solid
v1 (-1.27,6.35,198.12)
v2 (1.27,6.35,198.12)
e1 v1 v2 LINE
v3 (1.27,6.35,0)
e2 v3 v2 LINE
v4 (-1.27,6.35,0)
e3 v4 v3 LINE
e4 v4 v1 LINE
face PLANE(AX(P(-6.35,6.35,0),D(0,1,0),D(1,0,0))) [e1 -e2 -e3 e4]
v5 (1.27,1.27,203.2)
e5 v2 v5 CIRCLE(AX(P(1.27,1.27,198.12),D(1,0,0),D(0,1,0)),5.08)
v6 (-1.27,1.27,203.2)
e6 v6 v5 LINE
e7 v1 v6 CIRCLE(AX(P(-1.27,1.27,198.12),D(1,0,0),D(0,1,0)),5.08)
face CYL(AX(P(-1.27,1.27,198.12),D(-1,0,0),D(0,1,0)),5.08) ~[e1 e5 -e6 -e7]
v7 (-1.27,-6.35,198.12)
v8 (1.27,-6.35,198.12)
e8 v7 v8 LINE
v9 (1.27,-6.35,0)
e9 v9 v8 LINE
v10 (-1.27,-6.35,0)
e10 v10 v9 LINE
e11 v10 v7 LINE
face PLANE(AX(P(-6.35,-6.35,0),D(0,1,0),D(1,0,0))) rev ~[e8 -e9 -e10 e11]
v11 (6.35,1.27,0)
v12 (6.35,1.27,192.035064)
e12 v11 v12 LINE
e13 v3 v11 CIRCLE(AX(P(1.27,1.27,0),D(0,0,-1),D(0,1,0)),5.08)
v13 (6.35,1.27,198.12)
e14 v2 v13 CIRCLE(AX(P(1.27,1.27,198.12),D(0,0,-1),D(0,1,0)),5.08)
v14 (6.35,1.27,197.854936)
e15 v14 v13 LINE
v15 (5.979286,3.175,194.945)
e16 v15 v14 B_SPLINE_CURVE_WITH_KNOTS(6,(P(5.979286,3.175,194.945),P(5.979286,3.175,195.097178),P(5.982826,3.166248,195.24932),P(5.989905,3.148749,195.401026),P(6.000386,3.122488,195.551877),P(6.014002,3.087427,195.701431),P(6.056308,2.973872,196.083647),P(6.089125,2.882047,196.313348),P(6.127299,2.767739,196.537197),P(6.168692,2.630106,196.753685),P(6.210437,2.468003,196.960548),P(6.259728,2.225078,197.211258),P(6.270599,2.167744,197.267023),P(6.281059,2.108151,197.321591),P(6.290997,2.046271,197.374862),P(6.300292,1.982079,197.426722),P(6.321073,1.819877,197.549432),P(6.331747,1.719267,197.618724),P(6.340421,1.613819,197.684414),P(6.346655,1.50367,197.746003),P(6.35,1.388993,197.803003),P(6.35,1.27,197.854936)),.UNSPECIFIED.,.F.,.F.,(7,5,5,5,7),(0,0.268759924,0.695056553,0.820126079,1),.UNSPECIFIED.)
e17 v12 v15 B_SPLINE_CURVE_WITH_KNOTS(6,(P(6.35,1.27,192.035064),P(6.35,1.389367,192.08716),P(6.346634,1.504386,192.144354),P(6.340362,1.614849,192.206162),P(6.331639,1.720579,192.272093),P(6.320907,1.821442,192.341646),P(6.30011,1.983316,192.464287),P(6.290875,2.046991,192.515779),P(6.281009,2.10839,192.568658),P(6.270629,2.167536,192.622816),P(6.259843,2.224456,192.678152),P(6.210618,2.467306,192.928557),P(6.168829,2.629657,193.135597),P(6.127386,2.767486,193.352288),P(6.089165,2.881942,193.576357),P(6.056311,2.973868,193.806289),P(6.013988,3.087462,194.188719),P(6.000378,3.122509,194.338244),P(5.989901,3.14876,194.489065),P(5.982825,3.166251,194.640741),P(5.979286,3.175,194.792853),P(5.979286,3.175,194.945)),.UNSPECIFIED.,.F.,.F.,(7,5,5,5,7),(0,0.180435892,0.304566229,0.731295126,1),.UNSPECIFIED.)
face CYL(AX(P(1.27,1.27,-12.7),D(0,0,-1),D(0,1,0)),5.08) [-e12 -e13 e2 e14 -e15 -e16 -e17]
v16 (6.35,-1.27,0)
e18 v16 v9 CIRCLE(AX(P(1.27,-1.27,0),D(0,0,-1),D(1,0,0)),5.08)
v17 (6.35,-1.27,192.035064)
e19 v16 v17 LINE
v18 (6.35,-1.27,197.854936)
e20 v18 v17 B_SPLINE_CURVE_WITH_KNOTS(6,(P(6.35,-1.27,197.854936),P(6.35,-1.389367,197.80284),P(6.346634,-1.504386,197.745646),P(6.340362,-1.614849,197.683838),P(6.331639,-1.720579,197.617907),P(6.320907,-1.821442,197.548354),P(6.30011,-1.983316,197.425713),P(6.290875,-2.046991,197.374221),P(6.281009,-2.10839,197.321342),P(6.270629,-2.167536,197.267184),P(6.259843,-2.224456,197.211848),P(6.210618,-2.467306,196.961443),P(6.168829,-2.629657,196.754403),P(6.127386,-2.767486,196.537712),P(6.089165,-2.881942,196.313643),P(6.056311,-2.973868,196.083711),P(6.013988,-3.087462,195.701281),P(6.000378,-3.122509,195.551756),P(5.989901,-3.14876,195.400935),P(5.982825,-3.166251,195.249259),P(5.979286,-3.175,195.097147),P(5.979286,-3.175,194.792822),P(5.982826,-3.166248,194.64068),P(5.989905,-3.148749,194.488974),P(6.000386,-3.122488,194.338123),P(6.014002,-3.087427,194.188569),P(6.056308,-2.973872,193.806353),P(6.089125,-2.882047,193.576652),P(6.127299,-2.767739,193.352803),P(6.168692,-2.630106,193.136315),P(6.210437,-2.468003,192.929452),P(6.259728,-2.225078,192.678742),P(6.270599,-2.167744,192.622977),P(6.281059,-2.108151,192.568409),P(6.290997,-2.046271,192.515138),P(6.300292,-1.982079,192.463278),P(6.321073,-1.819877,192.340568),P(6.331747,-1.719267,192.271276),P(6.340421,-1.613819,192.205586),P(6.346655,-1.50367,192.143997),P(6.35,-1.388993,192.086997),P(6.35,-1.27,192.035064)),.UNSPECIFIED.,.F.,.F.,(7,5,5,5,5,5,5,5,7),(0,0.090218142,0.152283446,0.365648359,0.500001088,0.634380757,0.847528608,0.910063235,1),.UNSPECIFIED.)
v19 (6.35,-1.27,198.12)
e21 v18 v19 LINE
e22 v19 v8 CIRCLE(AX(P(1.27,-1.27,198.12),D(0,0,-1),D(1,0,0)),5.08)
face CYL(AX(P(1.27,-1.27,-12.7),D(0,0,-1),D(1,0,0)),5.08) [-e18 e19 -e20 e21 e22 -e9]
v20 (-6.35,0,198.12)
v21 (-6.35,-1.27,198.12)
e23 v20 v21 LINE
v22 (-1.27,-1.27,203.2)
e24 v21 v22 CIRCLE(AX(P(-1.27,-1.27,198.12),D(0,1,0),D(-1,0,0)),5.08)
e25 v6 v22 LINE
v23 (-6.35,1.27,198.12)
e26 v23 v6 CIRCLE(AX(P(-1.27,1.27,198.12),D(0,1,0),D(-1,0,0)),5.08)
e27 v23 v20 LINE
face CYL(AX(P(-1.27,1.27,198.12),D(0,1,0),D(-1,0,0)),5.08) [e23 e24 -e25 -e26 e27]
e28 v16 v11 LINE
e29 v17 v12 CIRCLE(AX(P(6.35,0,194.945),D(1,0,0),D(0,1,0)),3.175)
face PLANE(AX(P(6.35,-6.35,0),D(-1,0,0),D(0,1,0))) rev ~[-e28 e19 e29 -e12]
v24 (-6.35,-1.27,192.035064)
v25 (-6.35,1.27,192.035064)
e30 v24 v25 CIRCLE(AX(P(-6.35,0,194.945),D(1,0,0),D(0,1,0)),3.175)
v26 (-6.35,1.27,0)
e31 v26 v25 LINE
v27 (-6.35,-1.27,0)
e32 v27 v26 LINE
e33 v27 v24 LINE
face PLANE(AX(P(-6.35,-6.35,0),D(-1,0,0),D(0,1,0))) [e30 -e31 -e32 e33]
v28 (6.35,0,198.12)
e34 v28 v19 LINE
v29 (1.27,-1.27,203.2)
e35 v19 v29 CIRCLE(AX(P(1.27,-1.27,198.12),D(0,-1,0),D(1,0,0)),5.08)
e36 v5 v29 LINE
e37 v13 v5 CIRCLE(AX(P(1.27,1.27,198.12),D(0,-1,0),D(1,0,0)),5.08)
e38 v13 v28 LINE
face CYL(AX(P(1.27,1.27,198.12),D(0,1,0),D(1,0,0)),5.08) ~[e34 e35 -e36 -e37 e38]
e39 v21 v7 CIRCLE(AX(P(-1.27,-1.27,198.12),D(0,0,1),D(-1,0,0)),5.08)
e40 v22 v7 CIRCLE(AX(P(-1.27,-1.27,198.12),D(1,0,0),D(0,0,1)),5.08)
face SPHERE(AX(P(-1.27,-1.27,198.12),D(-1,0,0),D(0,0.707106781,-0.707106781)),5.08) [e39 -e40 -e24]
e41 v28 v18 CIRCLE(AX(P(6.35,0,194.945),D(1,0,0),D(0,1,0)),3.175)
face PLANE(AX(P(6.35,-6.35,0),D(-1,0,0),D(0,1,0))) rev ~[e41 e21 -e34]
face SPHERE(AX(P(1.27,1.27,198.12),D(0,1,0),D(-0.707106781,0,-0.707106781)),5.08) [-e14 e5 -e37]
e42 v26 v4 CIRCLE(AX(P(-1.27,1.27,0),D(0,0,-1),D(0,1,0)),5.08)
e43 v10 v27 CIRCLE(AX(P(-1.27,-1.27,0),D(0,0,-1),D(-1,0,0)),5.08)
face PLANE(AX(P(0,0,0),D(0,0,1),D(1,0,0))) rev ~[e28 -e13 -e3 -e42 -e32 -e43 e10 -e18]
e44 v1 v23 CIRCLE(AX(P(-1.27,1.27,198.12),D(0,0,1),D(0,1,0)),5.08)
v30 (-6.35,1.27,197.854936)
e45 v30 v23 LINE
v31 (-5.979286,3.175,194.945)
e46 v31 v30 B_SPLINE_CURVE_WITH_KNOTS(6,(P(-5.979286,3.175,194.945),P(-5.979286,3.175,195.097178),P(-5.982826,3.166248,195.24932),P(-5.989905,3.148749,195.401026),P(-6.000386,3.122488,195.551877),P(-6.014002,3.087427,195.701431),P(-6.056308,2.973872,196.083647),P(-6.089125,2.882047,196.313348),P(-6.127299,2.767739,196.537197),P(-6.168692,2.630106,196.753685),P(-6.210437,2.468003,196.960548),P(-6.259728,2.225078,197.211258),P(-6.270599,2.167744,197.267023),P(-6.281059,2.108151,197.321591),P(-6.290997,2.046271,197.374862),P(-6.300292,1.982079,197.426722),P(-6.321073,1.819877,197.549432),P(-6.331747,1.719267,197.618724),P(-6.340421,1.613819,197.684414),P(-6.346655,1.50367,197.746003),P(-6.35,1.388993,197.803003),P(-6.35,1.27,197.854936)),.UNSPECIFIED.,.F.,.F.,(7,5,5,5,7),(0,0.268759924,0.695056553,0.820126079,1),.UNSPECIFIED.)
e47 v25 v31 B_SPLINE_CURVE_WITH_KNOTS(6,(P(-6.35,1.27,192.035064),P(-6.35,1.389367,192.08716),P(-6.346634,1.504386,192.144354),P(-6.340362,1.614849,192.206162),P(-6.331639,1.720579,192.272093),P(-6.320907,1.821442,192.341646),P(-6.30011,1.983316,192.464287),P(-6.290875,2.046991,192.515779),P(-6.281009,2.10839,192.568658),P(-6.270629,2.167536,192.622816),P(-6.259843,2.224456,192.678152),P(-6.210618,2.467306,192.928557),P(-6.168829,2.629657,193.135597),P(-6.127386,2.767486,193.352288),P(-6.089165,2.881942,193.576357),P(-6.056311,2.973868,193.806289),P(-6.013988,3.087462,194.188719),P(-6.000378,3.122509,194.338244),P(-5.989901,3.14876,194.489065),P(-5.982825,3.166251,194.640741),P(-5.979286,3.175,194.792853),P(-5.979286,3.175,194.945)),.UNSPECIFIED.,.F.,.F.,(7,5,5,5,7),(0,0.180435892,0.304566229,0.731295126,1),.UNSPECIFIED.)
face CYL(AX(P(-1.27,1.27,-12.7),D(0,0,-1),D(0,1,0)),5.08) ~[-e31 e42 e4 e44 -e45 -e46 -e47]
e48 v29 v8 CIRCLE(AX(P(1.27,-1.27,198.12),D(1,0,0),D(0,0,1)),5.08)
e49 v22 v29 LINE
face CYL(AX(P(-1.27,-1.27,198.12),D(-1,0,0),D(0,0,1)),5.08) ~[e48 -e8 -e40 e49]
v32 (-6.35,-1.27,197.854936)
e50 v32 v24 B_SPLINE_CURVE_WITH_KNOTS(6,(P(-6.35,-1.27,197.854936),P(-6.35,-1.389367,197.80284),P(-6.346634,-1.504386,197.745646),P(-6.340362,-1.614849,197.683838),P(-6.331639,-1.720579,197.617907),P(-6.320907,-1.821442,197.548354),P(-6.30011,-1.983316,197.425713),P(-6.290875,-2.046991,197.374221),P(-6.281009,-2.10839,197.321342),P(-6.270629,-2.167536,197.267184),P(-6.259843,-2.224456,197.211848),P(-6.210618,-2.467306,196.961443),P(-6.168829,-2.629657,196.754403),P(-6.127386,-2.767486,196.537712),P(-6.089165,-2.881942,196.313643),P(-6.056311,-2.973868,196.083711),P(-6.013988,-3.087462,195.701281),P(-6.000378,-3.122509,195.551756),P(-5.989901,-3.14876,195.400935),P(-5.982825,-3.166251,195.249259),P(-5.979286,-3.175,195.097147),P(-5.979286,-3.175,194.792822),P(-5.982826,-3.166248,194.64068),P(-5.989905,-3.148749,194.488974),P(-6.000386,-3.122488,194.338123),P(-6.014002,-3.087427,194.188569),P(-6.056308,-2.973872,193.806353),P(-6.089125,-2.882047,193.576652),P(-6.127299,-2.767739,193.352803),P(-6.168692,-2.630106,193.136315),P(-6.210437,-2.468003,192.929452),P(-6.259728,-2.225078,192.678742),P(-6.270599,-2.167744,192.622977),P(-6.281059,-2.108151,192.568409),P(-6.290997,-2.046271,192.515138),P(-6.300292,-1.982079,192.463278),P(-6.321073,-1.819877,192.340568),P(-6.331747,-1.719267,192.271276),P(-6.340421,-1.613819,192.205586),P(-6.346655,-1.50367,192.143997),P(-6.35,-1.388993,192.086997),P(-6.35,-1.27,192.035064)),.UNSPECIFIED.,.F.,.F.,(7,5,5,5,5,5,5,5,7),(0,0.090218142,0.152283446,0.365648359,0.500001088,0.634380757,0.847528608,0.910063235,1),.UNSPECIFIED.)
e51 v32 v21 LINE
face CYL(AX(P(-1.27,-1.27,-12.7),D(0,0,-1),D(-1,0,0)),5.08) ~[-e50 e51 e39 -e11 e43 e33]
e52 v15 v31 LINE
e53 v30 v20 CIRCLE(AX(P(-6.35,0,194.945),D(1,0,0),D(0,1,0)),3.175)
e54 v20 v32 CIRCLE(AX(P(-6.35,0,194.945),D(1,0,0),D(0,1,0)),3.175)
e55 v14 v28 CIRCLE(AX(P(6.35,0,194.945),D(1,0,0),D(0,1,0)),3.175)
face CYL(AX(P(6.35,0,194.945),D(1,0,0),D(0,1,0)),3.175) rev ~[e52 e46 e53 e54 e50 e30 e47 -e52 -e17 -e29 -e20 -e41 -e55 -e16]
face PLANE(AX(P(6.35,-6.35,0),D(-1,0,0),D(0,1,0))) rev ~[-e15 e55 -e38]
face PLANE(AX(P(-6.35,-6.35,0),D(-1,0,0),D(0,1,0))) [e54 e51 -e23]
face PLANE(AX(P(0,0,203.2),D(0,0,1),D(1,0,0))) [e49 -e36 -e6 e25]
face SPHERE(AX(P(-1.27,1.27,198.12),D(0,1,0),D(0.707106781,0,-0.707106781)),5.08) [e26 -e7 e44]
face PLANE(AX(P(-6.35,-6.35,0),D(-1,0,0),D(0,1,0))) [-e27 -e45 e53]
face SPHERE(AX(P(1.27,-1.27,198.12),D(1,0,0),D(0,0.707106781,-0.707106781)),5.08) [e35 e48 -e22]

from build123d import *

# Parameters (mm, degrees)
F0_W         = 12.7
F0_H         = 12.7
F1_DEPTH     = 203.2
F2_R         = 3.175
F3_DEPTH     = 25.4
F4_T1_DEPTH  = 210.82
F4_T3_DEPTH  = 2.54
F4_T5_DEPTH  = 2.54
F4_S9_W      = 5.08
F4_S9_H      = 5.08
F4_T10_DEPTH = 5.08
F4_S15_W     = 5.08
F4_S15_H     = 5.08
F4_T16_DEPTH = 5.08
F4_S21_W     = 5.08
F4_S21_H     = 5.08
F4_T22_DEPTH = 5.08
F4_S27_W     = 5.08
F4_S27_H     = 5.08
F4_T28_DEPTH = 5.08


# Not quite as in the source:
# - a fillet or chamfer that OpenCascade refuses, or shapes differently, is made with other operations: its cross-section is extruded or revolved along the edge and cut away or added


with BuildPart() as f1:
    # F0 (on Top) → F1 (new body)
    with BuildSketch(Plane.XY):
        Rectangle(F0_W, F0_H)
    extrude(amount=F1_DEPTH)

    # F2 (on face) → F3 (cut)
    with BuildSketch(Plane.YZ.offset(6.35)):
        with Locations((0, 194.945)):
            Circle(F2_R)
    extrude(amount=-F3_DEPTH, mode=Mode.SUBTRACT)

    # F4: fillet of radius 5.08 on 8 edges, made by hand

    # F4_s2 → F4_t1 (cut)
    with BuildSketch(Plane.XY.offset(-12.7)):
        with BuildLine():
            ThreePointArc((1.27, 6.35), (4.8621024484, 4.8621024484), (6.35, 1.27))
            Line((6.35, 1.27), (6.35, 6.35))
            Line((6.35, 6.35), (1.27, 6.35))
        make_face()
        with BuildLine():
            ThreePointArc((6.35, -1.27), (4.8621024484, -4.8621024484), (1.27, -6.35))
            Line((1.27, -6.35), (6.35, -6.35))
            Line((6.35, -6.35), (6.35, -1.27))
        make_face()
        with BuildLine():
            ThreePointArc((-1.27, 6.35), (-4.8621024484, 4.8621024484), (-6.35, 1.27))
            Line((-6.35, 1.27), (-6.35, 6.35))
            Line((-6.35, 6.35), (-1.27, 6.35))
        make_face()
        with BuildLine():
            ThreePointArc((-6.35, -1.27), (-4.8621024484, -4.8621024484), (-1.27, -6.35))
            Line((-1.27, -6.35), (-6.35, -6.35))
            Line((-6.35, -6.35), (-6.35, -1.27))
        make_face()
    extrude(amount=F4_T1_DEPTH, mode=Mode.SUBTRACT)

    # F4_s4 → F4_t3 (cut)
    with BuildSketch(Plane.YZ.offset(-1.27)):
        with BuildLine():
            ThreePointArc((6.35, 198.12), (4.8621024484, 201.7121024484), (1.27, 203.2))
            Line((1.27, 203.2), (6.35, 203.2))
            Line((6.35, 203.2), (6.35, 198.12))
        make_face()
        with BuildLine():
            ThreePointArc((-1.27, 203.2), (-4.8621024484, 201.7121024484), (-6.35, 198.12))
            Line((-6.35, 198.12), (-6.35, 203.2))
            Line((-6.35, 203.2), (-1.27, 203.2))
        make_face()
    extrude(amount=F4_T3_DEPTH, mode=Mode.SUBTRACT)

    # F4_s6 → F4_t5 (cut)
    with BuildSketch(Plane.XZ.offset(-1.27)):
        with BuildLine():
            ThreePointArc((6.35, 198.12), (4.8621024484, 201.7121024484), (1.27, 203.2))
            Line((1.27, 203.2), (6.35, 203.2))
            Line((6.35, 203.2), (6.35, 198.12))
        make_face()
        with BuildLine():
            ThreePointArc((-6.35, 198.12), (-4.8621024484, 201.7121024484), (-1.27, 203.2))
            Line((-1.27, 203.2), (-6.35, 203.2))
            Line((-6.35, 203.2), (-6.35, 198.12))
        make_face()
    extrude(amount=F4_T5_DEPTH, mode=Mode.SUBTRACT)


with BuildPart() as f4_tool8:
    # F4_s9 → F4_t10 (new body)
    with BuildSketch(Plane.XZ.offset(-1.27)):
        with Locations((3.81, 200.66)):
            Rectangle(F4_S9_W, F4_S9_H)
    extrude(amount=-F4_T10_DEPTH)

    # F4_s11 → F4_t12 (revolve, cut)
    with BuildSketch(Plane(origin=(1.27, 1.27, 198.12), x_dir=(-0.7071067812, 0, -0.7071067812), z_dir=(0.7071067812, 0, -0.7071067812))):
        with BuildLine():
            ThreePointArc((0, -5.08), (5.08, 0), (0, 5.08))
            Line((0, 5.08), (0, -5.08))
        make_face()
    revolve(axis=Axis((1.27, 1.27, 198.12), (0, 1, 0)), mode=Mode.SUBTRACT)


with BuildPart() as f1_1:
    add(f1.part)

    # F4_t7: cut F4_tool8
    add(f4_tool8.part, mode=Mode.SUBTRACT)


with BuildPart() as f4_tool14:
    # F4_s15 → F4_t16 (new body)
    with BuildSketch(Plane.YZ.offset(1.27)):
        with Locations((-3.81, 200.66)):
            Rectangle(F4_S15_W, F4_S15_H)
    extrude(amount=F4_T16_DEPTH)

    # F4_s17 → F4_t18 (revolve, cut)
    with BuildSketch(Plane(origin=(1.27, -1.27, 198.12), x_dir=(0, 0.7071067812, -0.7071067812), z_dir=(0, -0.7071067812, -0.7071067812))):
        with BuildLine():
            ThreePointArc((0, -5.08), (5.08, 0), (0, 5.08))
            Line((0, 5.08), (0, -5.08))
        make_face()
    revolve(axis=Axis((1.27, -1.27, 198.12), (1, 0, 0)), mode=Mode.SUBTRACT)


with BuildPart() as f1_2:
    add(f1_1.part)

    # F4_t13: cut F4_tool14
    add(f4_tool14.part, mode=Mode.SUBTRACT)


with BuildPart() as f4_tool20:
    # F4_s21 → F4_t22 (new body)
    with BuildSketch(Plane.XZ.offset(-1.27)):
        with Locations((-3.81, 200.66)):
            Rectangle(F4_S21_W, F4_S21_H)
    extrude(amount=-F4_T22_DEPTH)

    # F4_s23 → F4_t24 (revolve, cut)
    with BuildSketch(Plane(origin=(-1.27, 1.27, 198.12), x_dir=(0.7071067812, 0, -0.7071067812), z_dir=(0.7071067812, 0, 0.7071067812))):
        with BuildLine():
            ThreePointArc((0, -5.08), (5.08, 0), (0, 5.08))
            Line((0, 5.08), (0, -5.08))
        make_face()
    revolve(axis=Axis((-1.27, 1.27, 198.12), (0, 1, 0)), mode=Mode.SUBTRACT)


with BuildPart() as f1_3:
    add(f1_2.part)

    # F4_t19: cut F4_tool20
    add(f4_tool20.part, mode=Mode.SUBTRACT)


with BuildPart() as f4_tool26:
    # F4_s27 → F4_t28 (new body)
    with BuildSketch(Plane.YZ.offset(-1.27)):
        with Locations((-3.81, 200.66)):
            Rectangle(F4_S27_W, F4_S27_H)
    extrude(amount=-F4_T28_DEPTH)

    # F4_s29 → F4_t30 (revolve, cut)
    with BuildSketch(Plane(origin=(-1.27, -1.27, 198.12), x_dir=(0, 0.7071067812, -0.7071067812), z_dir=(0, 0.7071067812, 0.7071067812))):
        with BuildLine():
            ThreePointArc((0, -5.08), (5.08, 0), (0, 5.08))
            Line((0, 5.08), (0, -5.08))
        make_face()
    revolve(axis=Axis((-1.27, -1.27, 198.12), (-1, 0, 0)), mode=Mode.SUBTRACT)


with BuildPart() as f1_4:
    add(f1_3.part)

    # F4_t25: cut F4_tool26
    add(f4_tool26.part, mode=Mode.SUBTRACT)


solid = f1_4.part
